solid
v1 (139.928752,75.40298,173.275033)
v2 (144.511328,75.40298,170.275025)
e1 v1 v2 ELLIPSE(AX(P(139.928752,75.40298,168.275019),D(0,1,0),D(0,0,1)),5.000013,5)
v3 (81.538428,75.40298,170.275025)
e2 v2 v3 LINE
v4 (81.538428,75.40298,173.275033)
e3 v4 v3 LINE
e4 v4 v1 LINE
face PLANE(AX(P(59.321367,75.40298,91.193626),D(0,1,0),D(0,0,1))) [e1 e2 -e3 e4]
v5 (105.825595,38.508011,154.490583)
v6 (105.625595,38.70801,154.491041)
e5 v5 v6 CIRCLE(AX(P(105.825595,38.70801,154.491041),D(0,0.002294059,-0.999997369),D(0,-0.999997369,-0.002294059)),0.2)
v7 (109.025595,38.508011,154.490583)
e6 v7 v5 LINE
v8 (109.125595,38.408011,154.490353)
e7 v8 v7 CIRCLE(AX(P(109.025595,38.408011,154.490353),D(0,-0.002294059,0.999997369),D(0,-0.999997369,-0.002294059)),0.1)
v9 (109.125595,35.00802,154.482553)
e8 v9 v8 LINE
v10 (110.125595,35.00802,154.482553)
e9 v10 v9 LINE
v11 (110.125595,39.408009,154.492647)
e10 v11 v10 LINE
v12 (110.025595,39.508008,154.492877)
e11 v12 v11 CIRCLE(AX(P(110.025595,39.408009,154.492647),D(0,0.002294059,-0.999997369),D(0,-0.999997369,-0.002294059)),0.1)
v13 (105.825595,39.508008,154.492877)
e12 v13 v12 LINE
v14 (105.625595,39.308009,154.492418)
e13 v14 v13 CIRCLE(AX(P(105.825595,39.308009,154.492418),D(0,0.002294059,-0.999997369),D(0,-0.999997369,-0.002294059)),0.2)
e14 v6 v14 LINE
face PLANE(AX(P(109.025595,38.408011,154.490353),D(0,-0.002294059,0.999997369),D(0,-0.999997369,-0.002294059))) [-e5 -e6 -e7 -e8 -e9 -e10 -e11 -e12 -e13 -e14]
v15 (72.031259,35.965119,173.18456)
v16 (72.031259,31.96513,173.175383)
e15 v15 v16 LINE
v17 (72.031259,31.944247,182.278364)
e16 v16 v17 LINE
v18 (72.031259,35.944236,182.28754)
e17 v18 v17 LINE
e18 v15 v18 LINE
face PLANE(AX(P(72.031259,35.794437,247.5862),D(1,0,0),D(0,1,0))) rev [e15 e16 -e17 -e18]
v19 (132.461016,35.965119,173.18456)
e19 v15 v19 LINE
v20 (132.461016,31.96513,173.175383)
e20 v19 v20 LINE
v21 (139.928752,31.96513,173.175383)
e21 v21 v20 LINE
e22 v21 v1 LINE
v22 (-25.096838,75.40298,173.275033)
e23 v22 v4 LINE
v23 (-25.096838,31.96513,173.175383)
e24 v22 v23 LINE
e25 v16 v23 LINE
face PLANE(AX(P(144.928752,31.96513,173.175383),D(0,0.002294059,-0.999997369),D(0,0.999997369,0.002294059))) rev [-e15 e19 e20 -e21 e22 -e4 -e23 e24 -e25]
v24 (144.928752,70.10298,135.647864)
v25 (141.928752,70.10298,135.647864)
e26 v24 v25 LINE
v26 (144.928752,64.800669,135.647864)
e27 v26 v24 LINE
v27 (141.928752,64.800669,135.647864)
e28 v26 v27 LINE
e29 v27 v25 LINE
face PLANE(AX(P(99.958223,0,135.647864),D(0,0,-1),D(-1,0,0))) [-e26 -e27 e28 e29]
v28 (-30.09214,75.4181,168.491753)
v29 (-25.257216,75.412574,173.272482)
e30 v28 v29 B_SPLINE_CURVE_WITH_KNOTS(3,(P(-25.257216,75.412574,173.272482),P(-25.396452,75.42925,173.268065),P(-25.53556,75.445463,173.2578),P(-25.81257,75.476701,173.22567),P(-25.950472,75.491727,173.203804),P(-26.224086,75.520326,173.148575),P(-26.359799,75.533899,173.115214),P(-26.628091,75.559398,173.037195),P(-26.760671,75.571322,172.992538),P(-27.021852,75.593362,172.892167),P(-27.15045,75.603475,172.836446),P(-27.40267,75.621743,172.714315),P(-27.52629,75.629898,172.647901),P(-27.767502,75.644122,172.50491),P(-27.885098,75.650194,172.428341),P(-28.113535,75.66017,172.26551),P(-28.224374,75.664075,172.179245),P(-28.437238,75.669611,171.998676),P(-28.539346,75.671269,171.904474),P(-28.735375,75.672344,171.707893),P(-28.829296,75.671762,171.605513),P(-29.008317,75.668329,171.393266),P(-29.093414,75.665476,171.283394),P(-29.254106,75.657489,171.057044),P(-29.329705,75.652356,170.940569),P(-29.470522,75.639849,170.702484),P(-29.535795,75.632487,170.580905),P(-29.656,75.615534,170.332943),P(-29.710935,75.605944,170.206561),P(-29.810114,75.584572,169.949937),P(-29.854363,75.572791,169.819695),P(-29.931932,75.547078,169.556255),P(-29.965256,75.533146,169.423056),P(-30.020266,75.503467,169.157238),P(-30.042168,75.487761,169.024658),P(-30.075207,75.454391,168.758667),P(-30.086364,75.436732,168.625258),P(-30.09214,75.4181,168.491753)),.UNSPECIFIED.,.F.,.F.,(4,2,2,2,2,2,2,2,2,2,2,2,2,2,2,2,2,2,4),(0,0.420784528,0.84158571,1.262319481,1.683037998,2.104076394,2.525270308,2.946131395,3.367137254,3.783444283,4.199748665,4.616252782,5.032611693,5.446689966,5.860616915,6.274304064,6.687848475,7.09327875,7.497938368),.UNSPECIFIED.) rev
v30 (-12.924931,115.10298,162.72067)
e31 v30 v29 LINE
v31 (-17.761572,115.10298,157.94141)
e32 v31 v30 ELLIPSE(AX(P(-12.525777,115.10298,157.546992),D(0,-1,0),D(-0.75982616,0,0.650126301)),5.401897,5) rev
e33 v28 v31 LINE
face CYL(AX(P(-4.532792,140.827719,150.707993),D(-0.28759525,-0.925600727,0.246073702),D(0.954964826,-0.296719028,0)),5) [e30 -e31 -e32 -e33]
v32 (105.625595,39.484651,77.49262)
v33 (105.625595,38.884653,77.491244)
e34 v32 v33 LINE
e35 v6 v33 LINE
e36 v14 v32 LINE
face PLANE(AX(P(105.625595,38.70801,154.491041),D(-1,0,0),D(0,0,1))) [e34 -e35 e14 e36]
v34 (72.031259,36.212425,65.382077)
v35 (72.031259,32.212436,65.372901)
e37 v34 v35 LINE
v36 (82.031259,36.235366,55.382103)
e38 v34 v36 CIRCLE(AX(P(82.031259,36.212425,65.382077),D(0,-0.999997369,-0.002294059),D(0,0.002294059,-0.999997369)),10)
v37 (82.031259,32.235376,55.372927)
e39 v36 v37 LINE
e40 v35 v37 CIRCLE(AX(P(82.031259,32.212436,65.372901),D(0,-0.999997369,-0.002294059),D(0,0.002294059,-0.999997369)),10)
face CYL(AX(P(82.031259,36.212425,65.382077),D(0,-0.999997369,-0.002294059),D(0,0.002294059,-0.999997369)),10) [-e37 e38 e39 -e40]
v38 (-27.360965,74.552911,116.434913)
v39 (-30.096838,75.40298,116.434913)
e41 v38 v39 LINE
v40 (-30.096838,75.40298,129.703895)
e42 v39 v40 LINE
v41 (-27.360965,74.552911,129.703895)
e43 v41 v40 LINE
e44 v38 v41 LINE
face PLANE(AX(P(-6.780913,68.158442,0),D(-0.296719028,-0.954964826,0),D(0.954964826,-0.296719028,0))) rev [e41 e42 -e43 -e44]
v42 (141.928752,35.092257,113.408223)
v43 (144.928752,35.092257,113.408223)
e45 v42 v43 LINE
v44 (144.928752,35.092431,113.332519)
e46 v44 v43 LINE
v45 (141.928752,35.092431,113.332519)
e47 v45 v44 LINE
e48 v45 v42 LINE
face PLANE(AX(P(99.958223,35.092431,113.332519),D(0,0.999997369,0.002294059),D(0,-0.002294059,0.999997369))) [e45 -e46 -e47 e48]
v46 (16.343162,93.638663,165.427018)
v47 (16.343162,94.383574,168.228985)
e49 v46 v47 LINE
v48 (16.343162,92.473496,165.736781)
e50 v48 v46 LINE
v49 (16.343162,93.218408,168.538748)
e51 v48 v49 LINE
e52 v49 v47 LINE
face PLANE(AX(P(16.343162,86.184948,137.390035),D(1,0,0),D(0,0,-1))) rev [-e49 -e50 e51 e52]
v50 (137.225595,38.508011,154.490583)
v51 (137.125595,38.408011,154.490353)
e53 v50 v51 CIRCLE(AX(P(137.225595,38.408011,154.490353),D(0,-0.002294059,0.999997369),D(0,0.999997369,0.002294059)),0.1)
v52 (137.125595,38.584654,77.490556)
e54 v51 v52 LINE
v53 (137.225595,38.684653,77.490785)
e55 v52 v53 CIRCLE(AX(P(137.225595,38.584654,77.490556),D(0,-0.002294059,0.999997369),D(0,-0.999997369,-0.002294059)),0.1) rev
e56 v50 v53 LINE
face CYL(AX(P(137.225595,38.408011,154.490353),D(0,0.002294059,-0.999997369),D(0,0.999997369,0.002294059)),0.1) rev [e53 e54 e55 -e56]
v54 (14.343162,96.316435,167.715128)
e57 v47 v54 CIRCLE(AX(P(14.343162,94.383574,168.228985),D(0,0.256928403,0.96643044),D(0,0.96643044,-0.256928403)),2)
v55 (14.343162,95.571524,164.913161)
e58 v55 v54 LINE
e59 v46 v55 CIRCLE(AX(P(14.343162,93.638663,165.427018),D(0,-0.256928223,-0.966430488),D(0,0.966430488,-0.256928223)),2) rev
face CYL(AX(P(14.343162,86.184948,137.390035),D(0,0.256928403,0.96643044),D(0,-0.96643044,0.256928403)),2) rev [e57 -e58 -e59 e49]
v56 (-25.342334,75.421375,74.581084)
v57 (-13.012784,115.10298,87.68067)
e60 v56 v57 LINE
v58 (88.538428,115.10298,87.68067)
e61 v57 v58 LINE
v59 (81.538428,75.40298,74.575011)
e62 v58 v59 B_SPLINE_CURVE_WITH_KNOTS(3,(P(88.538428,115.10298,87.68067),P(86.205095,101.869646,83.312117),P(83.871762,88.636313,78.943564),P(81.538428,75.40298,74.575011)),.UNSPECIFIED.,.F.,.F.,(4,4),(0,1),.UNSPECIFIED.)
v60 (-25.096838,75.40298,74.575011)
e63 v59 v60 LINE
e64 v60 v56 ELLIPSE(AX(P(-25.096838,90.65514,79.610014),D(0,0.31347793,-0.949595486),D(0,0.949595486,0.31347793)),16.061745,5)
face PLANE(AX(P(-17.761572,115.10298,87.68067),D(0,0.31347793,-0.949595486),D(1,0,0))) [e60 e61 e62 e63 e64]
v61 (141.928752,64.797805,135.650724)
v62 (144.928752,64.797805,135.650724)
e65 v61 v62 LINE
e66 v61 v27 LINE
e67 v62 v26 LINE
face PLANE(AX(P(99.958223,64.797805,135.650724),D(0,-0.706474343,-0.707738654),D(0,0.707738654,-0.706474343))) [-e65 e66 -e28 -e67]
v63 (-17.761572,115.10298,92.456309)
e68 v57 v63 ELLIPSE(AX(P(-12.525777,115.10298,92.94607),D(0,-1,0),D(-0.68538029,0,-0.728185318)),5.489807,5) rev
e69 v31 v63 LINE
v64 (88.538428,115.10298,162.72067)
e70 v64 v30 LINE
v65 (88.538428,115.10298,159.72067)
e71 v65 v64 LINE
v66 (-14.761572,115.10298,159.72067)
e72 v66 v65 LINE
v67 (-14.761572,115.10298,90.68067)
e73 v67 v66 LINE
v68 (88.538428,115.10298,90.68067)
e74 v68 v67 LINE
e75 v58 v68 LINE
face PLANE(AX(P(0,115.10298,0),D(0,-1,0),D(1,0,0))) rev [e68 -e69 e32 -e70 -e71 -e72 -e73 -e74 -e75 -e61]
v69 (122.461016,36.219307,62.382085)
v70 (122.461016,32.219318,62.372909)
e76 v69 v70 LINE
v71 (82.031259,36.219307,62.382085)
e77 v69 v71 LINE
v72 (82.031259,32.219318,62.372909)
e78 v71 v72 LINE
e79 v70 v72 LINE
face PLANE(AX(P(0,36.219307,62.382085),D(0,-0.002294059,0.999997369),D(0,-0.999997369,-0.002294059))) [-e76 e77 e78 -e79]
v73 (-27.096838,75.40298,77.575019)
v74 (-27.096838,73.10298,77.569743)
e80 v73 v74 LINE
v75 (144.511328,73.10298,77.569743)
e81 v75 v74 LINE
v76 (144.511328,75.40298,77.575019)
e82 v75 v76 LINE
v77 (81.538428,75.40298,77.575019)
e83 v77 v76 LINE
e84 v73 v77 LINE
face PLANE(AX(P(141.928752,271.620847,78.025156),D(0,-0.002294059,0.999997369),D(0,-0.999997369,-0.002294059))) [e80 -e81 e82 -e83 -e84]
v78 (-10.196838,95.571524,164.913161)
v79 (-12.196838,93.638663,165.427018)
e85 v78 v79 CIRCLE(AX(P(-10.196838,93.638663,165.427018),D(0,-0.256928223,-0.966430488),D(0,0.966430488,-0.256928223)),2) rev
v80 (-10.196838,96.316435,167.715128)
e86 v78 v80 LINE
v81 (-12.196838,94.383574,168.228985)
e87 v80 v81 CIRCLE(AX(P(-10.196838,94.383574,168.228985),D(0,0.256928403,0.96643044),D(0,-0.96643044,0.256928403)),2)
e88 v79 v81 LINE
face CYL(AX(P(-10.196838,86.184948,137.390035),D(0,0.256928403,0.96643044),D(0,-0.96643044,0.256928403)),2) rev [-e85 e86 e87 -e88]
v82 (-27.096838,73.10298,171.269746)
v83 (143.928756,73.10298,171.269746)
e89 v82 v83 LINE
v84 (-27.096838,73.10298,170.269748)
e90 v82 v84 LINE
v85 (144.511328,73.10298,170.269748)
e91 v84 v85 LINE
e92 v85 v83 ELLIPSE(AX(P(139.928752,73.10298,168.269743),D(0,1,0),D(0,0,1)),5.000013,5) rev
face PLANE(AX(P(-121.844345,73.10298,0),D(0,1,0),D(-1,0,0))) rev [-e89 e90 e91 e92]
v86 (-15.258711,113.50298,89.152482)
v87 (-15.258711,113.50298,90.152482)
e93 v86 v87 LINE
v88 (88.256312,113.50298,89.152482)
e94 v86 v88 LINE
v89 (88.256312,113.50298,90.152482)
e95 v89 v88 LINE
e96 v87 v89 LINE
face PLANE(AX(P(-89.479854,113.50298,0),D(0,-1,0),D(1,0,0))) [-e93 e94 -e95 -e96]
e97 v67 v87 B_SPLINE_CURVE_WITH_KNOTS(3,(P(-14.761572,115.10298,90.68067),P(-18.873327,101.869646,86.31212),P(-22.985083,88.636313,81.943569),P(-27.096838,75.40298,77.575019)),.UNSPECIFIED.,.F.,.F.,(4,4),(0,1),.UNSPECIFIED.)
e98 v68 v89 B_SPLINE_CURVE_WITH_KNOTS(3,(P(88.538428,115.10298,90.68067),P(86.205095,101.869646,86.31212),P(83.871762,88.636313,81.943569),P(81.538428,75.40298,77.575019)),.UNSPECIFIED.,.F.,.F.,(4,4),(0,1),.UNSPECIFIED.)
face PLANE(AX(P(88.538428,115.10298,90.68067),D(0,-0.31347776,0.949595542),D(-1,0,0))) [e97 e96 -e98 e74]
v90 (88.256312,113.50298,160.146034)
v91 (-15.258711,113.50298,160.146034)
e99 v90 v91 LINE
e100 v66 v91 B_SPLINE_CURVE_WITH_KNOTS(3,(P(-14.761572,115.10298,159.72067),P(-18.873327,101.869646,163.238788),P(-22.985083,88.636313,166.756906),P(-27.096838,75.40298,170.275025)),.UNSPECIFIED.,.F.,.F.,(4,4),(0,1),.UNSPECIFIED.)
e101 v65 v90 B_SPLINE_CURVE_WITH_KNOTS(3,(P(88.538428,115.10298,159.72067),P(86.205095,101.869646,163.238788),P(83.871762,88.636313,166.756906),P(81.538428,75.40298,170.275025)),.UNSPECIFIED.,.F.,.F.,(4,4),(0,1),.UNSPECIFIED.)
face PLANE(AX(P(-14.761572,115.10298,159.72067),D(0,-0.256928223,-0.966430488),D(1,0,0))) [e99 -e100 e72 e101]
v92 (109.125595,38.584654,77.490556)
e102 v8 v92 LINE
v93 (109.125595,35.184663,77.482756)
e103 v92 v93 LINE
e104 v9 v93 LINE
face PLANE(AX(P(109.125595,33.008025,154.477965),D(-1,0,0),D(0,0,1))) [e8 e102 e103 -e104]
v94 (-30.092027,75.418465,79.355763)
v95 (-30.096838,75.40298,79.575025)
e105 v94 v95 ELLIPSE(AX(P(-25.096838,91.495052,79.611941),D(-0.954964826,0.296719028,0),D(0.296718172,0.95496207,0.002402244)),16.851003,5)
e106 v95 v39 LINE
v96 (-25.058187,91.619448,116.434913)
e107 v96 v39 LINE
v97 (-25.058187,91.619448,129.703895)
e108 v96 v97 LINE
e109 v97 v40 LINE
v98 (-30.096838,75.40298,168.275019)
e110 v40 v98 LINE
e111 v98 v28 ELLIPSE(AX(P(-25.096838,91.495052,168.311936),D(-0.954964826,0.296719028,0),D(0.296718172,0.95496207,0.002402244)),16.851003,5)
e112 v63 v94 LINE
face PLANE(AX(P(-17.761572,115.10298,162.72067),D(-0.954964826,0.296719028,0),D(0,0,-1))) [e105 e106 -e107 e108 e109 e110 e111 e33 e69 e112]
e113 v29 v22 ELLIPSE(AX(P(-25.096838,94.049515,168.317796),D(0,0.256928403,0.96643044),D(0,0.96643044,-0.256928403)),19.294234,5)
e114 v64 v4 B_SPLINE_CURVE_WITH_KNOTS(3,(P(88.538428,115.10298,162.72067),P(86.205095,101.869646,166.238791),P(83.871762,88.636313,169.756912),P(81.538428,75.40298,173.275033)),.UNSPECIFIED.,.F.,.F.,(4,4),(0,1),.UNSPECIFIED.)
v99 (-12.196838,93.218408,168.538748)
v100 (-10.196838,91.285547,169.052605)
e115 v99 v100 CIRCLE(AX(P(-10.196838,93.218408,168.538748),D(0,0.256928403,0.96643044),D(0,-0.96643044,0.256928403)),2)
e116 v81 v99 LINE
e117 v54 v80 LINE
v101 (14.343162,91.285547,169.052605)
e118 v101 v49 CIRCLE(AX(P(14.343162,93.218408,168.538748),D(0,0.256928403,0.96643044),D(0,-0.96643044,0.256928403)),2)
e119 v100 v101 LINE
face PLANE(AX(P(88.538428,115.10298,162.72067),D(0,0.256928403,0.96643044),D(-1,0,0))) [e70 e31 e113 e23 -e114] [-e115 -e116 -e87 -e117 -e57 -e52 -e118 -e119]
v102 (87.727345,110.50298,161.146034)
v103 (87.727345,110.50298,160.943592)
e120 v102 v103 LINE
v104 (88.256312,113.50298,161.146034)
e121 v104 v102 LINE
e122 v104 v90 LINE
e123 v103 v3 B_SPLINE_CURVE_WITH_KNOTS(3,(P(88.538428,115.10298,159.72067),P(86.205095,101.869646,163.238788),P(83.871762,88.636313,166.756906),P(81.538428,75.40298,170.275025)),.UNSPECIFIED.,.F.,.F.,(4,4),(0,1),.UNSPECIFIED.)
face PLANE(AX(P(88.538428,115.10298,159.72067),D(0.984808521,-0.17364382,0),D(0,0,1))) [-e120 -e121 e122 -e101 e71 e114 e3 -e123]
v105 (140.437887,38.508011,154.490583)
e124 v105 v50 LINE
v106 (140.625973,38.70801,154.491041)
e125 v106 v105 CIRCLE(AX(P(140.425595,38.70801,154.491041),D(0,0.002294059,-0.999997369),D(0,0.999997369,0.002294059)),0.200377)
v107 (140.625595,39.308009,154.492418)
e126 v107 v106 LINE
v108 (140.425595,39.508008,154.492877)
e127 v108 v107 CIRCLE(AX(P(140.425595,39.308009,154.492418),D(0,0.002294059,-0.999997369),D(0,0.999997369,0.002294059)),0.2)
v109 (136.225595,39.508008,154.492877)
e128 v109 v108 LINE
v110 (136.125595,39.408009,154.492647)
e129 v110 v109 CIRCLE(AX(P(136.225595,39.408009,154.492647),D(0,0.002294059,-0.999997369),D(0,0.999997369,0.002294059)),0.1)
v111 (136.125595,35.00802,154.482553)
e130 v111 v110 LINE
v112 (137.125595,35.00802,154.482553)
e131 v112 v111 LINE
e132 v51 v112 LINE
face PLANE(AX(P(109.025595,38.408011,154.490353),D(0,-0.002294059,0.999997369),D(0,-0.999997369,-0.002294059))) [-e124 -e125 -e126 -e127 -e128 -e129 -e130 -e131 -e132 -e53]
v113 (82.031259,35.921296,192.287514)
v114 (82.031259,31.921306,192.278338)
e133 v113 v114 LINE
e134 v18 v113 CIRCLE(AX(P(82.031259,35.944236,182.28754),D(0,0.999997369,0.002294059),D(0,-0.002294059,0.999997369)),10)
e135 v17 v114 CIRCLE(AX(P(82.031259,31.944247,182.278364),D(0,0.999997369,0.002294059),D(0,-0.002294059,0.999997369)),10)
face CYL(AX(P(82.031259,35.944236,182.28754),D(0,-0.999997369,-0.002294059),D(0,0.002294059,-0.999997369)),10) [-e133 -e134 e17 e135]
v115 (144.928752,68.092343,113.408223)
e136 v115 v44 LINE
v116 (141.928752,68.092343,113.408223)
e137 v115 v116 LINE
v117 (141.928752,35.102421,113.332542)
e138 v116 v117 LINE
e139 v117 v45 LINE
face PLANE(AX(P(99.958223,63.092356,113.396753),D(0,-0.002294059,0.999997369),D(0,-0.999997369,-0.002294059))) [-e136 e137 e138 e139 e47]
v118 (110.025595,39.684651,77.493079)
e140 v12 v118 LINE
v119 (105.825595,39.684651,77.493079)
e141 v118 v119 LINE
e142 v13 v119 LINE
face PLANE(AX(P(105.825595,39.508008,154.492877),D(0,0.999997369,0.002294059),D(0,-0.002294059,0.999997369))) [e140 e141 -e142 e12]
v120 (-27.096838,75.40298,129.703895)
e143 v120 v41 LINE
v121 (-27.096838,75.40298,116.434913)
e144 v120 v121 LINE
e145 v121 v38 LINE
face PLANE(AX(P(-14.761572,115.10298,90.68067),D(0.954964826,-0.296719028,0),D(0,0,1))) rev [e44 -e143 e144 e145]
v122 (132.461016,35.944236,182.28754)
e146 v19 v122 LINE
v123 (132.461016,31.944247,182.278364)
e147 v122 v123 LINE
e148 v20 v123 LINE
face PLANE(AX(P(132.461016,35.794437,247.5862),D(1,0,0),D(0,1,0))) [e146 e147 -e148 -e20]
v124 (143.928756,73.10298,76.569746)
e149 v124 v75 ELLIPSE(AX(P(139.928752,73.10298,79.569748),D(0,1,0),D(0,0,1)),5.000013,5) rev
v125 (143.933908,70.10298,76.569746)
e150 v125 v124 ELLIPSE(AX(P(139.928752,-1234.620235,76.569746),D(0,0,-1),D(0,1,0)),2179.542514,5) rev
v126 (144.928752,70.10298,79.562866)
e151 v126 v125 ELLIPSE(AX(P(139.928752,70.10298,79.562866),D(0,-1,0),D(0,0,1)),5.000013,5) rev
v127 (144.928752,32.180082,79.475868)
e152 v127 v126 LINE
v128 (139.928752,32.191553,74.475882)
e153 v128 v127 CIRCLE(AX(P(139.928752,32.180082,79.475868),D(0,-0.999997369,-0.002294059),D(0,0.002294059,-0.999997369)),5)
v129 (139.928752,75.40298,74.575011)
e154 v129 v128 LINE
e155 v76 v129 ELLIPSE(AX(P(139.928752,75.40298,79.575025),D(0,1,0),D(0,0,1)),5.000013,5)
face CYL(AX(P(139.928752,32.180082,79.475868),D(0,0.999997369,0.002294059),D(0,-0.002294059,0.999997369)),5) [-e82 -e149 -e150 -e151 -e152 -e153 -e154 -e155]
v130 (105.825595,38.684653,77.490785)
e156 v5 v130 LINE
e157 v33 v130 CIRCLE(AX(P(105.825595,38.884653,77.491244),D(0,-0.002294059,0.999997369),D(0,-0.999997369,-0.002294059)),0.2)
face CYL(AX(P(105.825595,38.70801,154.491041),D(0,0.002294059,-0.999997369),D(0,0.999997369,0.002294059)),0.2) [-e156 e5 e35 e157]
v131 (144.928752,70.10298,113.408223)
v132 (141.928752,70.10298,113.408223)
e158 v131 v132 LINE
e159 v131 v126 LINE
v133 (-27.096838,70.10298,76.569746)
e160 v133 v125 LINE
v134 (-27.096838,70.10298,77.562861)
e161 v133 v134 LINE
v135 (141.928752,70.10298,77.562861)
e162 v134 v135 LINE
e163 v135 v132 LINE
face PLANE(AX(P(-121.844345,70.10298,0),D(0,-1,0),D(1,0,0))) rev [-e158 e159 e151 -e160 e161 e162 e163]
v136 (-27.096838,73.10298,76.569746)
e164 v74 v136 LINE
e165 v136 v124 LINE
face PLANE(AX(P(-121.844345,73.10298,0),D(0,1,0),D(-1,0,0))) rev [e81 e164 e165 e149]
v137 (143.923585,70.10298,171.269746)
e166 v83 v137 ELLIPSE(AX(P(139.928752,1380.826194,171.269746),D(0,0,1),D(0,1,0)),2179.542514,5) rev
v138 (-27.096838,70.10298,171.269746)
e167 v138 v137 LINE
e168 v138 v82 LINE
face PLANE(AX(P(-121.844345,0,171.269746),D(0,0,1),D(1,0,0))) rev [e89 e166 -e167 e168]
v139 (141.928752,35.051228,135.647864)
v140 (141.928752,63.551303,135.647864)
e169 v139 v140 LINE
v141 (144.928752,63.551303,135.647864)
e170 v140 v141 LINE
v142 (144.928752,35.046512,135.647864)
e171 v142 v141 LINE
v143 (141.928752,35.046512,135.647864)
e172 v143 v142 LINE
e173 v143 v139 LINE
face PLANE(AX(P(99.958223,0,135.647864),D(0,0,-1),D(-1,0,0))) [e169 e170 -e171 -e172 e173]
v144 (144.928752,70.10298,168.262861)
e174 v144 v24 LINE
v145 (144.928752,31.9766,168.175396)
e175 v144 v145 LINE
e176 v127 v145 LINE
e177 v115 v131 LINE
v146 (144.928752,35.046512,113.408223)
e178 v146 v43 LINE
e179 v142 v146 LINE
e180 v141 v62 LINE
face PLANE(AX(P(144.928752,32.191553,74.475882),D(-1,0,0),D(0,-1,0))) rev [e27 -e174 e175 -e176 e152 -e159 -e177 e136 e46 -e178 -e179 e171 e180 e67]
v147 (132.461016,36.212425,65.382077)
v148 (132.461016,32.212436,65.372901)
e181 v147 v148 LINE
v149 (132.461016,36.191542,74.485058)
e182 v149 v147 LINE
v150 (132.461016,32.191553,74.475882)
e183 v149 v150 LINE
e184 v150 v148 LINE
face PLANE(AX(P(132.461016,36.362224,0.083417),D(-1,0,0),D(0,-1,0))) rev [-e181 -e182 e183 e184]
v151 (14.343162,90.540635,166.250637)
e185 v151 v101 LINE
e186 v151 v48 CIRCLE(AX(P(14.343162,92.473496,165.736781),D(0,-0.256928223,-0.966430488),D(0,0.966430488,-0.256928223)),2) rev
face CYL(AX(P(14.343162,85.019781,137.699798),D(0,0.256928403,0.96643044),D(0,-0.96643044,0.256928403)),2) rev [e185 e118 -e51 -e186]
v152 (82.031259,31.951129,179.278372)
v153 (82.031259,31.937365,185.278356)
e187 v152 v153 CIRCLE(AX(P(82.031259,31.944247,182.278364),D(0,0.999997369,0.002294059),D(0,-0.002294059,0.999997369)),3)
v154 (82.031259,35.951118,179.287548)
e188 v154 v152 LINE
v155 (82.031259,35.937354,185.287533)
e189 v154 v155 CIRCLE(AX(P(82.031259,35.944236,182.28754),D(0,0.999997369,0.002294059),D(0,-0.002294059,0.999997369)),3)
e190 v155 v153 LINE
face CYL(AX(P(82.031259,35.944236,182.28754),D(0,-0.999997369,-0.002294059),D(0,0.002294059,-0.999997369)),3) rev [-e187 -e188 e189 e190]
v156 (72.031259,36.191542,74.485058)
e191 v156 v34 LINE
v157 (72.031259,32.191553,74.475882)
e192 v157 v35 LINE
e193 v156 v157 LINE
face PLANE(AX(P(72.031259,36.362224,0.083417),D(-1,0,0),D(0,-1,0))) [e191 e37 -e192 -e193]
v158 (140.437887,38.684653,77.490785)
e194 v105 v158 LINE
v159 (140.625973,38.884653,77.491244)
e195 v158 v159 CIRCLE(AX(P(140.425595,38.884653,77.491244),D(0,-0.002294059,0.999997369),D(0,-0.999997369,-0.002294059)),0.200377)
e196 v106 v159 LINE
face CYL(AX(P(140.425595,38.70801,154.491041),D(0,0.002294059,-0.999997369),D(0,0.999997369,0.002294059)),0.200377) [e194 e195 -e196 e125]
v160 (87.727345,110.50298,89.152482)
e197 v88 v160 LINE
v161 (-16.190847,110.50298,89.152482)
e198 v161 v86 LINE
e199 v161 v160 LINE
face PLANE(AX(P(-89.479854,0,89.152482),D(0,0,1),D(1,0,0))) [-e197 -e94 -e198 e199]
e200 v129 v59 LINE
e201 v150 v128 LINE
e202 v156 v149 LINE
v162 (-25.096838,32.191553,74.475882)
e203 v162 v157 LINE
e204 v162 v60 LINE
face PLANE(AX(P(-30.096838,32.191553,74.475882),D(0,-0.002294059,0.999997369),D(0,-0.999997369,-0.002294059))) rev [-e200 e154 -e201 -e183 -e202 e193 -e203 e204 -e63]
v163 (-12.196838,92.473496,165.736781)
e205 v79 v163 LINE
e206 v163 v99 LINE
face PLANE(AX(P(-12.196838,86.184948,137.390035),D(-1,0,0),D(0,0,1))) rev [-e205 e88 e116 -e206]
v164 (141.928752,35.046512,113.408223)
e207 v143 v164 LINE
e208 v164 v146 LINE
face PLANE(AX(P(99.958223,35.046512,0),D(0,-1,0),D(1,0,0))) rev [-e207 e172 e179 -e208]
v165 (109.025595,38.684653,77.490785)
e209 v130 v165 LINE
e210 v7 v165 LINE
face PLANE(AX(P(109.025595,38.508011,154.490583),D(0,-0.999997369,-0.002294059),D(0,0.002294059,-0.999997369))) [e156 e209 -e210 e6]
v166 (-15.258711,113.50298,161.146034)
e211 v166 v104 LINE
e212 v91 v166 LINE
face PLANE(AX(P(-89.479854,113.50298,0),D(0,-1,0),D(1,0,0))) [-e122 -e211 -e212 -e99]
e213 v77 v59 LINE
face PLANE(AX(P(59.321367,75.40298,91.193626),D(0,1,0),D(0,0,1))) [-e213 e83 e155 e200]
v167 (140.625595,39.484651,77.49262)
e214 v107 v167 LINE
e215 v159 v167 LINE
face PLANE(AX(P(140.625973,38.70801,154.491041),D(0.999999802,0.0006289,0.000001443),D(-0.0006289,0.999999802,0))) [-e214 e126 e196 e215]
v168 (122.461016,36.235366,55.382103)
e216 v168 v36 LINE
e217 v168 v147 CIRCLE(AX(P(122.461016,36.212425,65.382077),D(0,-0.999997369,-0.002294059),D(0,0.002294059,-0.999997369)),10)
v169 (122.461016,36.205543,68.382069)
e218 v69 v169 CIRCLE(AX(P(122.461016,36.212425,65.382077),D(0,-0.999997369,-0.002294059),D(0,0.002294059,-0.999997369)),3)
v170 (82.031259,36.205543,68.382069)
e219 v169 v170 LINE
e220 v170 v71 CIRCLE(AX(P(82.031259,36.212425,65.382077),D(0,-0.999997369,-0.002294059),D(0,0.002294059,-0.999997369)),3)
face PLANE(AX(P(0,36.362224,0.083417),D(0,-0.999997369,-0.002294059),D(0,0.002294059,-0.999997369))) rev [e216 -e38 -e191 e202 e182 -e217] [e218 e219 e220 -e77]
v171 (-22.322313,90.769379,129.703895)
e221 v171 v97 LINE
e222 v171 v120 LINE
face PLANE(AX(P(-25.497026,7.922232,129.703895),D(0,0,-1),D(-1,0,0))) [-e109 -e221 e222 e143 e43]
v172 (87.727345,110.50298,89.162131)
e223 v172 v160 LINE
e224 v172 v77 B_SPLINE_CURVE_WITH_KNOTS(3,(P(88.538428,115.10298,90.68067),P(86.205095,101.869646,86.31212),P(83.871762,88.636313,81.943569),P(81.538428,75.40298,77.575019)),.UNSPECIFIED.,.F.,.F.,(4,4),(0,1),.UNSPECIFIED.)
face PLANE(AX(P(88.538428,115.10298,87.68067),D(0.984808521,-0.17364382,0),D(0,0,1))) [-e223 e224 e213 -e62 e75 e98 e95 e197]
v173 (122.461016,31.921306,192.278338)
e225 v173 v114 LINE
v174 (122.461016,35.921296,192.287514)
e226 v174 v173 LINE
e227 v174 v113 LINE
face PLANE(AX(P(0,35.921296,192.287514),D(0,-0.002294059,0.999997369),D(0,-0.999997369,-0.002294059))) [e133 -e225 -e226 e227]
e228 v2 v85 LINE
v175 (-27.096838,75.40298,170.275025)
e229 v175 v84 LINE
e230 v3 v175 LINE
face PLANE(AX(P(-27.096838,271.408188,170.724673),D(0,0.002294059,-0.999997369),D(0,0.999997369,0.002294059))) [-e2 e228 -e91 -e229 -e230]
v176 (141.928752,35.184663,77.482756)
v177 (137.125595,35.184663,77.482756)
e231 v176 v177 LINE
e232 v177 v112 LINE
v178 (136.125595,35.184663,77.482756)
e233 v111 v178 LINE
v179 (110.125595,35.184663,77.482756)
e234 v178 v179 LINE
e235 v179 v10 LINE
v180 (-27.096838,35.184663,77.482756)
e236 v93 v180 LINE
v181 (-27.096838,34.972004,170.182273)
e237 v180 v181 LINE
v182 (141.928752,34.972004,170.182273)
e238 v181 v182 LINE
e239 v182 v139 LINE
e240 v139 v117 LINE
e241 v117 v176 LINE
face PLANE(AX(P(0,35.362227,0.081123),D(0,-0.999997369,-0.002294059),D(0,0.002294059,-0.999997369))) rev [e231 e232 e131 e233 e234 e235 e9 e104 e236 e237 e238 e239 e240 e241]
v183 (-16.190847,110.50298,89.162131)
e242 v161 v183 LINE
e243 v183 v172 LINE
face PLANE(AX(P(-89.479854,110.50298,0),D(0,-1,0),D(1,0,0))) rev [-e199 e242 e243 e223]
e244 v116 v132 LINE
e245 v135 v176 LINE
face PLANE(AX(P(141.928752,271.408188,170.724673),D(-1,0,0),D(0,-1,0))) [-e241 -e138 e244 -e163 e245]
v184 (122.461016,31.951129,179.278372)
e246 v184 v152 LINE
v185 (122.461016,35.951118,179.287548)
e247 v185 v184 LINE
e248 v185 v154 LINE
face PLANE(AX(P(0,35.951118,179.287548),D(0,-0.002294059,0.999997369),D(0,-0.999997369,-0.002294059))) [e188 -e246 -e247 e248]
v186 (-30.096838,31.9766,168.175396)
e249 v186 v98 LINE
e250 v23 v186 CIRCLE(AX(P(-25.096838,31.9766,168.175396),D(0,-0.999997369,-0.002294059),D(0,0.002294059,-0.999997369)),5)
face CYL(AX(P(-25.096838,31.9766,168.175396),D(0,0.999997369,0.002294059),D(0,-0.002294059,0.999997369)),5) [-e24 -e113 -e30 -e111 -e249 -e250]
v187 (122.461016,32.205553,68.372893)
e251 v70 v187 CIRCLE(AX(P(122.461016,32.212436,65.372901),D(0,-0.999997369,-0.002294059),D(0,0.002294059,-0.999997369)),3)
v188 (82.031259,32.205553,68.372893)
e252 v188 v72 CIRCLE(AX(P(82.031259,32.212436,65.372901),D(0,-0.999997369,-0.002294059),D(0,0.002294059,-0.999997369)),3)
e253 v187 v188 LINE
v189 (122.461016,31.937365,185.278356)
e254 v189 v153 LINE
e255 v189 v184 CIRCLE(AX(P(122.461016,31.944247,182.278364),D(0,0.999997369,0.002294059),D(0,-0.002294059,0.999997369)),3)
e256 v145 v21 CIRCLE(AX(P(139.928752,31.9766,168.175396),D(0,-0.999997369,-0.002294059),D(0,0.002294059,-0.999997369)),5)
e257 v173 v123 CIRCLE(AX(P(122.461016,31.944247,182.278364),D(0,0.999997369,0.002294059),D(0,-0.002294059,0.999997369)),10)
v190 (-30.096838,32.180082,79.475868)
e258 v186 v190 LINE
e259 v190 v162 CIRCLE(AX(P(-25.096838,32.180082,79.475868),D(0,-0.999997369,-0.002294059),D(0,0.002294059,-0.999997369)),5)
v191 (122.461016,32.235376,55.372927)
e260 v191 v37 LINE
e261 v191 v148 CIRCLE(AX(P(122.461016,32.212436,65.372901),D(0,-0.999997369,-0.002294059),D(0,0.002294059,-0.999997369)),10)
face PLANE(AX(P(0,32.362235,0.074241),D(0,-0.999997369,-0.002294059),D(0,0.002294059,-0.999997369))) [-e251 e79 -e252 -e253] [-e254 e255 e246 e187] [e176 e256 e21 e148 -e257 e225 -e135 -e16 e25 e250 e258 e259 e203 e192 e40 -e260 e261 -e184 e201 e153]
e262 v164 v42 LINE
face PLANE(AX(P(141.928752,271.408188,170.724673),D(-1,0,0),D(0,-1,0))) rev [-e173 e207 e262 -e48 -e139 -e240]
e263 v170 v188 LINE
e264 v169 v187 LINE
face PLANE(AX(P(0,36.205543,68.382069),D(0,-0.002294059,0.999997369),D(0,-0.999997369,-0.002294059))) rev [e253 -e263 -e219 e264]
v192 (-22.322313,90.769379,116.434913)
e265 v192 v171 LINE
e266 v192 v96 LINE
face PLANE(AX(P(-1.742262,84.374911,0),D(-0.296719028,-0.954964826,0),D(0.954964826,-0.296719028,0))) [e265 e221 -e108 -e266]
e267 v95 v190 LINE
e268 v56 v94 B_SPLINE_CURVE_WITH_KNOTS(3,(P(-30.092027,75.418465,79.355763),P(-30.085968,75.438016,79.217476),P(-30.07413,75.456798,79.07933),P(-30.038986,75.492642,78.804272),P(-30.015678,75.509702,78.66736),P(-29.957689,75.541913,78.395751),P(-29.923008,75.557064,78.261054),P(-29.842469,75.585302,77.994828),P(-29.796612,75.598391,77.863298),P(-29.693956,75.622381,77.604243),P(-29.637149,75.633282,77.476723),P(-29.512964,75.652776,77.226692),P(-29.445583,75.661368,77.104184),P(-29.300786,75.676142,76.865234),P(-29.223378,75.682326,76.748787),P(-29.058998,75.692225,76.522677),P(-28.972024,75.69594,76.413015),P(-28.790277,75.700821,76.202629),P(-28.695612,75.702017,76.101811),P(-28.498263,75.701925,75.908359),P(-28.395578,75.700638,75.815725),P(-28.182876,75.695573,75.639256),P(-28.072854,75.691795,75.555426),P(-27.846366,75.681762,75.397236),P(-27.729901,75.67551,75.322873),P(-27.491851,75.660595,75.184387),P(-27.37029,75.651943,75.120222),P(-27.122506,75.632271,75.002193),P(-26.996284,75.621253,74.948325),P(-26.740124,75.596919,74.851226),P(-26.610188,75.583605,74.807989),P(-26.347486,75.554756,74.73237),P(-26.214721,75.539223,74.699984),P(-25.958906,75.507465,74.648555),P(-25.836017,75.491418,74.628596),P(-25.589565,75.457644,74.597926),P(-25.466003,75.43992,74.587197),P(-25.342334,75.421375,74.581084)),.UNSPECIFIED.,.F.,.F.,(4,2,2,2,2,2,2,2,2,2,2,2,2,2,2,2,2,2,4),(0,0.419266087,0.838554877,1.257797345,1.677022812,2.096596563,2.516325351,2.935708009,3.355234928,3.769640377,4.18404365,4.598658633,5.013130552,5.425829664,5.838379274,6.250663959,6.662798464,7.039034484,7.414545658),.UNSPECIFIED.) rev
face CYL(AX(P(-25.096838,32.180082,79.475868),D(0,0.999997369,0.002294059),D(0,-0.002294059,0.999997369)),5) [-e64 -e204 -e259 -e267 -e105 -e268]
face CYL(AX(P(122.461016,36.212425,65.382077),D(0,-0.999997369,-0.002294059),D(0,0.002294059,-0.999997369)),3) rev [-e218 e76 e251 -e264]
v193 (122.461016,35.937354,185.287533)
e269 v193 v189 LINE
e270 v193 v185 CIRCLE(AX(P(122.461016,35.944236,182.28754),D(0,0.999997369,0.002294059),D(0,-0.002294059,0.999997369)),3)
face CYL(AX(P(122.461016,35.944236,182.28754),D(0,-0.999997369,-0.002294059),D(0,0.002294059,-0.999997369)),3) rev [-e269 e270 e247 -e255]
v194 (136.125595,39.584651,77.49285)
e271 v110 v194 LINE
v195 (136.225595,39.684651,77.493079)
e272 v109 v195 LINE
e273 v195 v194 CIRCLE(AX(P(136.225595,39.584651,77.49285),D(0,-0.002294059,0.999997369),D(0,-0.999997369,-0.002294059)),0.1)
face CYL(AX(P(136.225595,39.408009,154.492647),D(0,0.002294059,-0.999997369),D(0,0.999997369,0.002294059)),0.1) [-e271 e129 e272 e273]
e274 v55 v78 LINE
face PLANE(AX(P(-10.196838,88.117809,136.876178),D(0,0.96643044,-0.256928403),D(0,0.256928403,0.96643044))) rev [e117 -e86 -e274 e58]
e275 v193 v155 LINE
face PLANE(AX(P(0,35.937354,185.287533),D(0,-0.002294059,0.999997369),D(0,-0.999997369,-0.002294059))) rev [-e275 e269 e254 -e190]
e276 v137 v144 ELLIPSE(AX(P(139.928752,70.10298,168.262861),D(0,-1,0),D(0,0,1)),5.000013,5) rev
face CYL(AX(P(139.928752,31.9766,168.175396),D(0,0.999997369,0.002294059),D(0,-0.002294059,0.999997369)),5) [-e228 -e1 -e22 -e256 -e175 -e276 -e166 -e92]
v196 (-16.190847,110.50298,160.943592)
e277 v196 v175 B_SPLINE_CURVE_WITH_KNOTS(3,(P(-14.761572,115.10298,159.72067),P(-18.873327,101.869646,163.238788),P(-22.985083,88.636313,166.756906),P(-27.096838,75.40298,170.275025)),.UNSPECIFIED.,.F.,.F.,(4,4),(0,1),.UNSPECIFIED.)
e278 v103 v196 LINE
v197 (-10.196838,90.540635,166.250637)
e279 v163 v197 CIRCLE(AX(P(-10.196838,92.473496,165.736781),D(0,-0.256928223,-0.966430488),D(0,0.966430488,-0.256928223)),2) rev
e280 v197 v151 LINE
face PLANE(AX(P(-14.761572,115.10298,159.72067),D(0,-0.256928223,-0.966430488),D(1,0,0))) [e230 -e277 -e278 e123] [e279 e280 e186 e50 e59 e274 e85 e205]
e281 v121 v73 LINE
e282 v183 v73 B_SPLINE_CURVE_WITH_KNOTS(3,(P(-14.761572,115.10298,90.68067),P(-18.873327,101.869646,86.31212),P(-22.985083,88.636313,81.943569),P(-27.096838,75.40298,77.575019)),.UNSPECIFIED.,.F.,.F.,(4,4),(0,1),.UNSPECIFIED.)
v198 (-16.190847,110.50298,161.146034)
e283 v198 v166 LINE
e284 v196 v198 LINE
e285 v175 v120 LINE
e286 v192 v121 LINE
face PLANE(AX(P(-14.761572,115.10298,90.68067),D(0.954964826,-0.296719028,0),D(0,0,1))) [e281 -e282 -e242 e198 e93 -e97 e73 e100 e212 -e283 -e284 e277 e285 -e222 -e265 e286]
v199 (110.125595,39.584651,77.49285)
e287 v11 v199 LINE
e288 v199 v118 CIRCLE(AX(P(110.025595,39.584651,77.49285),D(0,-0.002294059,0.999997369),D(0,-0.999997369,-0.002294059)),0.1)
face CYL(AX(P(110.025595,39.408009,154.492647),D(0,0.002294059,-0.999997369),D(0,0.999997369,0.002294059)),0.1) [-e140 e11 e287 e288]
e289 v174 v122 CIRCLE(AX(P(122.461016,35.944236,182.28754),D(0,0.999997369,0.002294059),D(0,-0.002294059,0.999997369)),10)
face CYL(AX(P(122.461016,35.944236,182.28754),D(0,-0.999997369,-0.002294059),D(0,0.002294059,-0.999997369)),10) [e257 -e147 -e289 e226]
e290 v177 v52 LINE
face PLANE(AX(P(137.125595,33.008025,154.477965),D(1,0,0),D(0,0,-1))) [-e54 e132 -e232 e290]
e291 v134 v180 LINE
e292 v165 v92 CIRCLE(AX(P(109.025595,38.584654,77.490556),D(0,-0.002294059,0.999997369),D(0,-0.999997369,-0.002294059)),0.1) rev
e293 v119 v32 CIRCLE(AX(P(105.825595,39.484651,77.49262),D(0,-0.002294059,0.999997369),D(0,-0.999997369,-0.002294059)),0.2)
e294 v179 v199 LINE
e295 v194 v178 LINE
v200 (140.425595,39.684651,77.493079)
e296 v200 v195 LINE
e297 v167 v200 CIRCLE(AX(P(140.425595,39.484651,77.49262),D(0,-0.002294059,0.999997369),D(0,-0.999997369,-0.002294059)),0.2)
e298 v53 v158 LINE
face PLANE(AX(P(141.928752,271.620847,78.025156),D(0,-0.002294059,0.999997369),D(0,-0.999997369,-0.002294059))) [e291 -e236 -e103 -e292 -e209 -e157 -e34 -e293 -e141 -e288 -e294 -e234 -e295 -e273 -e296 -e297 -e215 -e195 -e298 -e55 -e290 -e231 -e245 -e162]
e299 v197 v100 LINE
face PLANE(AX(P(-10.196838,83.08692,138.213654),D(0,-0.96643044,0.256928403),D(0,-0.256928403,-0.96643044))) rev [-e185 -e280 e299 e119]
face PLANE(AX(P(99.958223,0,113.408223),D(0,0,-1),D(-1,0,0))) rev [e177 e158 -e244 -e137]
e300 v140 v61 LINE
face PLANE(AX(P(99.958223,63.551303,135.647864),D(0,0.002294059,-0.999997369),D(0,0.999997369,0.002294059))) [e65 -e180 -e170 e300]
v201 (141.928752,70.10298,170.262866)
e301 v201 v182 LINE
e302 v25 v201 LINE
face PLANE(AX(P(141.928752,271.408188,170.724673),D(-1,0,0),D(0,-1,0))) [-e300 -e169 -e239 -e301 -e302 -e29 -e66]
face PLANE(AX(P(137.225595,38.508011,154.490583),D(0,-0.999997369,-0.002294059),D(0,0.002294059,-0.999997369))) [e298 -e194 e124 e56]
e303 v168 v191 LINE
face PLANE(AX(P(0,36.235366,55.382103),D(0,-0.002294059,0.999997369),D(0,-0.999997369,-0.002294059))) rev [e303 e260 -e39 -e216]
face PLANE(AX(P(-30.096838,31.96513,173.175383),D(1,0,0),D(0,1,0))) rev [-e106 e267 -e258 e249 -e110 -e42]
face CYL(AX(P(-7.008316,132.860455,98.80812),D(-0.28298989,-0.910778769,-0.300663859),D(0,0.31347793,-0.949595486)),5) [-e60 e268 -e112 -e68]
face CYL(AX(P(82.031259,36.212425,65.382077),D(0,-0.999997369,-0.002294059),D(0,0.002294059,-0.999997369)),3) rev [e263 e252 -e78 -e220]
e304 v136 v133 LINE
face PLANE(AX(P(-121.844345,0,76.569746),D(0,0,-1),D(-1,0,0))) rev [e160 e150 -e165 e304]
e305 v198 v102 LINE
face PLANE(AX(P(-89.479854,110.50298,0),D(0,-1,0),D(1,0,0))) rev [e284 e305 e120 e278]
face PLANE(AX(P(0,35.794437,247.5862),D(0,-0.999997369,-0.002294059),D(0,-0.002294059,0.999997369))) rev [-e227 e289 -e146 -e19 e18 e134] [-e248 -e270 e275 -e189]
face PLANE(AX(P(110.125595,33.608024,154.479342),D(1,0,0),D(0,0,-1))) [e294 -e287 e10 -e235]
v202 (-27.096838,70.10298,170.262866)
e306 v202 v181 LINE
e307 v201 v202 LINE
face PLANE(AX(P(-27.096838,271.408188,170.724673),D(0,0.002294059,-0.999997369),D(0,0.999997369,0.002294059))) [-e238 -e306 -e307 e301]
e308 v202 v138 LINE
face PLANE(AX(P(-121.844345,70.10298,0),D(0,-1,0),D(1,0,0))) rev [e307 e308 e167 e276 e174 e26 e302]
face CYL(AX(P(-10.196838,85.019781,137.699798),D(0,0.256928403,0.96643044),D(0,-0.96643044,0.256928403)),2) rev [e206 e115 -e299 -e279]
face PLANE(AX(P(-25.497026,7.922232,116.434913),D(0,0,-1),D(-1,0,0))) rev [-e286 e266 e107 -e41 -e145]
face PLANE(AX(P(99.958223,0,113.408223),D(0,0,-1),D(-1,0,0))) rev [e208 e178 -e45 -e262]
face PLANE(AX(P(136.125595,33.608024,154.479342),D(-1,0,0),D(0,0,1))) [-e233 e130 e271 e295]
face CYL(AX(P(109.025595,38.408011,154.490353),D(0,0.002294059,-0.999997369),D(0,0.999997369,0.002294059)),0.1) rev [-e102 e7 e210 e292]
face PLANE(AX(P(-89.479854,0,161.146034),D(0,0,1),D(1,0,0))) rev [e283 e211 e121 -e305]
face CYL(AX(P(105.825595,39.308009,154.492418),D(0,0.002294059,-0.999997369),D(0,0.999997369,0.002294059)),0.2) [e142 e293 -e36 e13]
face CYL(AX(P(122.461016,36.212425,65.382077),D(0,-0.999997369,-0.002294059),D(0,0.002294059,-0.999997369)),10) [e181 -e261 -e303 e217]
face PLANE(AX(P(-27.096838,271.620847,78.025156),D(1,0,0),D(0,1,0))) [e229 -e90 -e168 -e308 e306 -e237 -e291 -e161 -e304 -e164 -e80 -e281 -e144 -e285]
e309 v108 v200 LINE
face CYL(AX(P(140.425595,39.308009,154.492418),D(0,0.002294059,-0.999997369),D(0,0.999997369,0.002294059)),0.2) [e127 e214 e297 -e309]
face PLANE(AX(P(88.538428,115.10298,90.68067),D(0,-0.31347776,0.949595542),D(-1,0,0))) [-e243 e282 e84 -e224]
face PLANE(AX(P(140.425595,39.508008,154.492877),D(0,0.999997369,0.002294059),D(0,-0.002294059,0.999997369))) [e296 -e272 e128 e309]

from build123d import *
from OCP.BRepAlgoAPI import BRepAlgoAPI_Cut
from OCP.TopTools import TopTools_ListOfShape

# Parameters (mm, degrees)
SKETCH1_W            = 175.025590169
SKETCH1_H            = 98.699761336
BOSS_EXTRUDE1_DEPTH  = 3
SKETCH2_W            = 175.025590169
SKETCH2_H            = 98.699761336
SKETCH2_W_2          = 169.025590169
SKETCH2_H_2          = 92.699761336
BOSS_EXTRUDE2_DEPTH  = 35.5
BOSS_EXTRUDE3_DEPTH  = 80
CUT_EXTRUDE1_DEPTH   = 3
BOSS_EXTRUDE18_REACH = 231.088
CUT_EXTRUDE2_DEPTH   = 172.025590169
CUT_EXTRUDE6_DEPTH   = 10
CUT_EXTRUDE9_REACH   = 273.858
SKETCH20_W           = 55.04
SKETCH20_H           = 1.6
SKETCH20_W_2         = 71.993551849
SKETCH20_H_2         = 3
SKETCH21_W           = 13.268982054
SKETCH21_H           = 16.981220693
CUT_EXTRUDE10_DEPTH  = 2.864894477
CUT_EXTRUDE11_DEPTH  = 2.899295446
FILLET1_R            = 5
BOSS_EXTRUDE21_DEPTH = 4


with BuildPart() as part:
    # Sketch1 → Boss-Extrude1 (new body)
    with BuildSketch(Plane(origin=(0, 35.362227101, 0.081123263), x_dir=(1, 0, 0), z_dir=(6.9833353168161736e-15, -0.9999973686422646, -0.002294059403524814))):
        with Locations((57.415956998, 123.751717011)):
            Rectangle(SKETCH1_W, SKETCH1_H)
    extrude(amount=BOSS_EXTRUDE1_DEPTH)

    # Sketch2 → Boss-Extrude2 (add)
    with BuildSketch(Plane(origin=(0, 35.362227101, 0.081123263), x_dir=(1, 0, 0), z_dir=(-6.991181572878775e-15, 0.9999973686422646, 0.0022940594035248327))):
        with Locations((57.415956998, -123.751717011)):
            Rectangle(SKETCH2_W, SKETCH2_H)
        with Locations((57.415956998, -123.751717011)):
            Rectangle(SKETCH2_W_2, SKETCH2_H_2, mode=Mode.SUBTRACT)
    extrude(amount=BOSS_EXTRUDE2_DEPTH)

    # Sketch4 → Boss-Extrude3 (add)
    with BuildSketch(Plane(origin=(0, -0.170682232, 74.401640566), x_dir=(-1, 0, 0), z_dir=(0, 0.0022940594035248145, -0.9999973686422646))):
        with BuildLine():
            Line((-137.125595462, 33.362320152), (-137.125595462, 38.762320152))
            ThreePointArc((-137.125595462, 38.762320152), (-137.154884784, 38.83303083), (-137.225595462, 38.862320152))
            Line((-137.225595462, 38.862320152), (-140.437886876, 38.862320152))
            ThreePointArc((-140.437886876, 38.862320152), (-140.571564636, 38.925046414), (-140.625972803, 39.062320152))
            Line((-140.625972803, 39.062320152), (-140.625595462, 39.662320152))
            ThreePointArc((-140.625595462, 39.662320152), (-140.567016818, 39.803741508), (-140.425595462, 39.862320152))
            Line((-140.425595462, 39.862320152), (-136.225595462, 39.862320152))
            ThreePointArc((-136.225595462, 39.862320152), (-136.154884784, 39.83303083), (-136.125595462, 39.762320152))
            Line((-136.125595462, 39.762320152), (-136.125595462, 33.962320152))
            ThreePointArc((-136.125595462, 33.962320152), (-136.09630614, 33.891609474), (-136.025595462, 33.862320152))
            Line((-136.025595462, 33.862320152), (-110.225595462, 33.862320152))
            ThreePointArc((-110.225595462, 33.862320152), (-110.154884784, 33.891609474), (-110.125595462, 33.962320152))
            Line((-110.125595462, 33.962320152), (-110.125595462, 39.762320152))
            ThreePointArc((-110.125595462, 39.762320152), (-110.09630614, 39.83303083), (-110.025595462, 39.862320152))
            Line((-110.025595462, 39.862320152), (-105.825595462, 39.862320152))
            ThreePointArc((-105.825595462, 39.862320152), (-105.684174106, 39.803741508), (-105.625595462, 39.662320152))
            Line((-105.625595462, 39.662320152), (-105.625595462, 39.062320152))
            ThreePointArc((-105.625595462, 39.062320152), (-105.684174106, 38.920898796), (-105.825595462, 38.862320152))
            Line((-105.825595462, 38.862320152), (-109.025595462, 38.862320152))
            ThreePointArc((-109.025595462, 38.862320152), (-109.09630614, 38.83303083), (-109.125595462, 38.762320152))
            Line((-109.125595462, 38.762320152), (-109.125595462, 33.362320152))
            Line((-109.125595462, 33.362320152), (-109.125595462, 32.362320152))
            Line((-109.125595462, 32.362320152), (-137.125595462, 32.362320152))
            Line((-137.125595462, 32.362320152), (-137.125595462, 33.362320152))
        make_face()
    extrude(amount=-BOSS_EXTRUDE3_DEPTH)

    # Sketch5 → Cut-Extrude1 (cut)
    with BuildSketch(Plane(origin=(144.928752082, 0, 0), x_dir=(0, 0, -1), z_dir=(1, 0, 0))):
        Polygon((-135.647864414, 70.612709498), (-135.647864414, 64.800669259), (-135.65072397, 64.797804586), (-135.647864414, 63.551303119), (-135.647864414, 35.046511612), (-113.408223309, 35.046511612), (-113.408223309, 35.092257349), (-113.332519351, 35.092431019), (-113.408223309, 68.092343044), (-113.408223309, 70.612709498), align=None)
    extrude(amount=-CUT_EXTRUDE1_DEPTH, mode=Mode.SUBTRACT)

    # Boss-Extrude18: up to this plane
    boss_extrude18_end = Plane(origin=(59.321367117, 75.402979661, 91.193626143), z_dir=(0, 1, 0))
    # Sketch13 → Boss-Extrude18 (add, up to the surface)
    with BuildSketch(Plane(origin=(0, 70.862133688, 0.162562372), x_dir=(1, 0, 0), z_dir=(-8.261822211046718e-15, 0.9999973686422646, 0.002294059403524814)), mode=Mode.PRIVATE) as boss_extrude18_sk1:
        Polygon((141.928752082, -113.245958928), (144.928752082, -113.245958928), (144.928752082, -74.401836343), (-30.096838087, -74.401836343), (-30.096838087, -173.101597679), (144.928752082, -173.101597679), (144.928752082, -135.485658553), (141.928752082, -135.485658553), (141.928752082, -170.101597679), (-27.096838087, -170.101597679), (-27.096838087, -77.401836343), (141.928752082, -77.401836343), align=None)
    boss_extrude18_tool1 = split(extrude(boss_extrude18_sk1.sketch, amount=BOSS_EXTRUDE18_REACH, mode=Mode.PRIVATE), bisect_by=boss_extrude18_end, keep=Keep.BOTH, mode=Mode.PRIVATE)
    add(boss_extrude18_tool1.solids().sort_by_distance((143.428752, 70.60695, 111.398861))[0])

    # Sketch14 → Cut-Extrude2 (cut)
    with BuildSketch(Plane(origin=(144.928752082, 0, 0), x_dir=(0, 0, -1), z_dir=(1, 0, 0))):
        Polygon((-135.647864414, 70.551321539), (-135.653718085, 73.102979661), (-169.269745666, 73.102979661), (-171.269745666, 73.102979661), (-171.269745666, 70.102979661), (-135.647864414, 70.102979661), align=None)
        Polygon((-76.569745666, 73.102979661), (-78.569745666, 73.102979661), (-113.413959938, 73.102979661), (-113.408223309, 70.602340731), (-113.408223309, 70.102979661), (-76.569745666, 70.102979661), align=None)
        Polygon((-113.408223309, 70.602340731), (-113.413959938, 73.102979661), (-135.653718085, 73.102979661), (-135.647864414, 70.551321539), (-135.647864414, 70.102979661), (-113.408223309, 70.102979661), align=None)
    extrude(amount=-CUT_EXTRUDE2_DEPTH, mode=Mode.SUBTRACT)

    # Sketch15 → Cut-Extrude6 (cut)
    with BuildSketch(Plane(origin=(144.928752082, 0, 0), x_dir=(0, 0, -1), z_dir=(1, 0, 0))):
        Polygon((-113.419236289, 75.402979661), (-113.413959938, 73.102979661), (-77.569743035, 73.102979661), (-77.575019386, 75.402979661), align=None)
        Polygon((-135.653718085, 73.102979661), (-170.269748298, 73.102979661), (-170.275024648, 75.402979661), (-135.653718085, 75.402979661), align=None)
    extrude(amount=-CUT_EXTRUDE6_DEPTH, mode=Mode.SUBTRACT)

    # Loft1: read off the stored shape, not the designer's step
    # Loft1: loft between two sections, ruled curve by curve
    loft1_from = [
        Edge.make_line((-30.096838087, 75.402979661, 173.275032542), (81.538428177, 75.402979661, 173.275032542)),
        Edge.make_line((81.538428177, 75.402979661, 173.275032542), (81.538428177, 75.402979661, 170.275024648)),
        Edge.make_line((81.53842818, 75.402979661, 77.575019386), (81.53842818, 75.402979661, 74.575011492)),
        Edge.make_line((81.538428177, 75.402979661, 170.275024648), (-27.096838087, 75.402979661, 170.275024648)),
        Edge.make_line((-27.096838087, 75.402979661, 170.275024648), (-27.096838087, 75.402979661, 77.575019386)),
        Edge.make_line((-27.096838087, 75.402979661, 77.575019386), (81.53842818, 75.402979661, 77.575019386)),
        Edge.make_line((81.53842818, 75.402979661, 74.575011492), (-30.096838087, 75.402979661, 74.575011492)),
        Edge.make_line((-30.096838087, 75.402979661, 74.575011492), (-30.096838087, 75.402979661, 173.275032542)),
    ]
    loft1_to = [
        Edge.make_line((-17.76157182, 115.102979661, 162.720669643), (88.538428181, 115.102979661, 162.720669643)),
        Edge.make_line((88.538428181, 115.102979661, 162.720669643), (88.538428181, 115.102979661, 159.720669643)),
        Edge.make_line((88.538428181, 115.102979661, 90.680669643), (88.538428181, 115.102979661, 87.680669643)),
        Edge.make_line((88.538428181, 115.102979661, 159.720669643), (-14.761571819, 115.102979661, 159.720669643)),
        Edge.make_line((-14.761571819, 115.102979661, 159.720669643), (-14.761571819, 115.102979661, 90.680669643)),
        Edge.make_line((-14.761571819, 115.102979661, 90.680669643), (88.538428181, 115.102979661, 90.680669643)),
        Edge.make_line((88.538428181, 115.102979661, 87.680669643), (-17.76157182, 115.102979661, 87.680669643)),
        Edge.make_line((-17.76157182, 115.102979661, 87.680669643), (-17.76157182, 115.102979661, 162.720669643)),
    ]
    loft1 = Solid(Shell([*[Face.make_surface_from_curves(loft1_from[k], loft1_to[k]) for k in range(8)], Face(Wire(loft1_from)), Face(Wire(loft1_to))]))
    add(loft1)

    # Cut-Extrude9: up to this plane
    cut_extrude9_end = Plane(origin=(-14.761571819, 115.102979661, 90.680669643), z_dir=(0.9549648258216218, -0.2967190277745592, 0))
    # Sketch20 → Cut-Extrude9 (cut, up to the surface)
    with BuildSketch(Plane(origin=(144.928752082, 0, 0), x_dir=(0, 0, -1), z_dir=(1, 0, 0)), mode=Mode.PRIVATE) as cut_extrude9_sk1:
        with Locations((-125.200669643, 114.302979661)):
            Rectangle(SKETCH20_W, SKETCH20_H)
    cut_extrude9_tool1 = split(extrude(cut_extrude9_sk1.sketch, amount=-CUT_EXTRUDE9_REACH, mode=Mode.PRIVATE), bisect_by=cut_extrude9_end, keep=Keep.BOTH, mode=Mode.PRIVATE)
    add(cut_extrude9_tool1.solids().sort_by_distance((144.928752, 114.30298, 125.20067))[0], mode=Mode.SUBTRACT)
    # Sketch20 → Cut-Extrude9 (cut, up to the surface)
    with BuildSketch(Plane(origin=(144.928752082, 0, 0), x_dir=(0, 0, -1), z_dir=(1, 0, 0)), mode=Mode.PRIVATE) as cut_extrude9_sk2:
        with Locations((-125.149258153, 112.002979661)):
            Rectangle(SKETCH20_W_2, SKETCH20_H_2)
    cut_extrude9_tool2 = split(extrude(cut_extrude9_sk2.sketch, amount=-CUT_EXTRUDE9_REACH, mode=Mode.PRIVATE), bisect_by=cut_extrude9_end, keep=Keep.BOTH, mode=Mode.PRIVATE)
    add(cut_extrude9_tool2.solids().sort_by_distance((144.928752, 112.00298, 125.149258))[0], mode=Mode.SUBTRACT)

    # Sketch21 → Cut-Extrude10 (cut)
    with BuildSketch(Plane(origin=(-48.812951207, 15.166769532, 0), x_dir=(0, 0, 1), z_dir=(-0.9549648258269783, 0.2967190277573198, -6.667019861839508e-15))):
        with Locations((123.069403721, 71.56749915)):
            Rectangle(SKETCH21_W, SKETCH21_H)
    extrude(amount=-CUT_EXTRUDE10_DEPTH, mode=Mode.SUBTRACT)


with BuildPart() as cut_extrude11_tool:
    # Sketch22 → Cut-Extrude11 (new body)
    with BuildSketch(Plane(origin=(0, 48.002301666, 180.559584161), x_dir=(1, 0, 0), z_dir=(-1.1871401813108906e-14, 0.2569284026079074, 0.9664304402973601))):
        with BuildLine():
            Line((-10.196838087, 49.992354943), (14.343161913, 49.992354943))
            ThreePointArc((14.343161913, 49.992354943), (15.757375475, 49.406568505), (16.343161913, 47.992354943))
            Line((16.343161913, 47.992354943), (16.343161913, 46.78671544))
            ThreePointArc((16.343161913, 46.78671544), (15.757375475, 45.372501878), (14.343161913, 44.78671544))
            Line((14.343161913, 44.78671544), (-10.196838087, 44.78671544))
            ThreePointArc((-10.196838087, 44.78671544), (-11.611051649, 45.372501878), (-12.196838087, 46.78671544))
            Line((-12.196838087, 46.78671544), (-12.196838087, 47.992354943))
            ThreePointArc((-12.196838087, 47.992354943), (-11.611051649, 49.406568505), (-10.196838087, 49.992354943))
        make_face()
    extrude(amount=-CUT_EXTRUDE11_DEPTH)


with BuildPart() as part_1:
    add(part.part)

    # Cut-Extrude11: cut by cut_extrude11_tool, with a tolerance
    cut_extrude11_stock = TopTools_ListOfShape()
    cut_extrude11_stock.Append(part_1.part.wrapped)
    cut_extrude11_tools = TopTools_ListOfShape()
    cut_extrude11_tools.Append(cut_extrude11_tool.part.wrapped)
    cut_extrude11_cut = BRepAlgoAPI_Cut()
    cut_extrude11_cut.SetArguments(cut_extrude11_stock)
    cut_extrude11_cut.SetTools(cut_extrude11_tools)
    cut_extrude11_cut.SetFuzzyValue(0.00001)
    cut_extrude11_cut.Build()
    add(Compound.cast(cut_extrude11_cut.Shape()).solids(), mode=Mode.REPLACE)

    # Fillet1
    # the kernel refuses this fillet: 5 mm, written as the material it takes off along each edge
    with BuildSketch(Plane(origin=(144.928752082, 87.902946769, 173.303708285), x_dir=(-2.842170943040428e-14, 0.0022940594035265596, -0.9999973686422645), z_dir=(1.3086114820877341e-15, -0.9999973686422645, -0.0022940594035265596))) as fillet1_piece_1:
        with BuildLine():
            CenterArc((FILLET1_R, -FILLET1_R), FILLET1_R, 90, 90)
            Line((0, -FILLET1_R), (0, 0))
            Line((0, 0), (FILLET1_R, 0))
        make_face()
    fillet1_piece_1_solid = extrude(amount=68.437964315, mode=Mode.PRIVATE)
    with BuildSketch(Plane(origin=(144.928752082, 19.691585655, 74.447205908), x_dir=(0, -0.002294059403524528, 0.9999973686422645), z_dir=(-7.235076541341869e-15, 0.9999973686422646, 0.002294059403524528))) as fillet1_piece_2:
        with BuildLine():
            CenterArc((FILLET1_R, -FILLET1_R), FILLET1_R, 90, 90)
            Line((0, -FILLET1_R), (0, 0))
            Line((0, 0), (FILLET1_R, 0))
        make_face()
    fillet1_piece_2_solid = extrude(amount=68.211540603, mode=Mode.PRIVATE)
    with BuildSketch(Plane(origin=(-35.574773459, 57.772712947, 68.754954851), x_dir=(0.9591228921497503, -0.2687259220295025, -0.08871108489750493), z_dir=(0.2829898898446702, 0.9107787690719829, 0.30066385890795916))) as fillet1_piece_3:
        with BuildLine():
            CenterArc((FILLET1_R * 0.9109342886, -FILLET1_R), FILLET1_R, 90, 84.662925908)
            Line((-FILLET1_R * 0.0847304313661, -FILLET1_R * 0.906985133366), (0, 0))
            Line((0, 0), (FILLET1_R * 0.9109342886, 0))
        make_face()
    fillet1_piece_3_solid = extrude(amount=74.333102768, mode=Mode.PRIVATE)
    with BuildSketch(Plane(origin=(-35.758808566, 57.180411689, 178.119556354), x_dir=(0.9577520410970738, -0.27794080400398097, 0.07389138815863325), z_dir=(0.287595249916248, 0.9256007267731117, -0.24607370201364104))) as fillet1_piece_4:
        with BuildLine():
            CenterArc((FILLET1_R * 0.926460606246, FILLET1_R), FILLET1_R, 184.372217137, 85.627782863)
            Line((-FILLET1_R * 0.0706292300039, FILLET1_R * 0.923764454174), (0, 0))
            Line((0, 0), (FILLET1_R * 0.926460606246, 0))
        make_face()
    fillet1_piece_4_solid = extrude(amount=74.159109449, mode=Mode.PRIVATE)
    with BuildSketch(Plane(origin=(-30.096838087, 96.652923745, 173.323781305), x_dir=(1, 0, 0), z_dir=(6.951998498590891e-15, -0.9999973686422645, -0.0022940594035271494))) as fillet1_piece_5:
        with BuildLine():
            CenterArc((FILLET1_R, -FILLET1_R), FILLET1_R, 90, 90)
            Line((0, -FILLET1_R), (0, 0))
            Line((0, 0), (FILLET1_R, 0))
        make_face()
    fillet1_piece_5_solid = extrude(amount=77.187964315, mode=Mode.PRIVATE)
    with BuildSketch(Plane(origin=(-30.096838087, 19.691585655, 74.447205908), x_dir=(1, 0, 0), z_dir=(-7.070642983583899e-15, 0.9999973686422646, 0.0022940594035247915))) as fillet1_piece_6:
        with BuildLine():
            CenterArc((FILLET1_R, -FILLET1_R), FILLET1_R, 90, 90)
            Line((0, -FILLET1_R), (0, 0))
            Line((0, 0), (FILLET1_R, 0))
        make_face()
    fillet1_piece_6_solid = extrude(amount=76.961540603, mode=Mode.PRIVATE)
    add([fillet1_piece_1_solid, fillet1_piece_2_solid, fillet1_piece_3_solid, fillet1_piece_4_solid, fillet1_piece_5_solid, fillet1_piece_6_solid], mode=Mode.SUBTRACT)

    # Sketch25 → Boss-Extrude21 (add)
    with BuildSketch(Plane(origin=(0, 32.362234995, 0.074241085), x_dir=(1, 0, 0), z_dir=(6.977506045685946e-15, -0.9999973686422646, -0.002294059403524763))):
        with BuildLine():
            Line((132.461015957, 65.298831473), (132.461015957, 74.401836343))
            Line((132.461015957, 74.401836343), (72.0312592, 74.401836343))
            Line((72.0312592, 74.401836343), (72.0312592, 65.298831473))
            ThreePointArc((72.0312592, 65.298831473), (74.960191388, 58.227763661), (82.0312592, 55.298831473))
            Line((82.0312592, 55.298831473), (122.461015957, 55.298831473))
            ThreePointArc((122.461015957, 55.298831473), (129.532083769, 58.227763661), (132.461015957, 65.298831473))
        make_face()
        with BuildLine():
            ThreePointArc((122.461015957, 68.298831473), (125.461015957, 65.298831473), (122.461015957, 62.298831473))
            Line((122.461015957, 62.298831473), (82.0312592, 62.298831473))
            ThreePointArc((82.0312592, 62.298831473), (79.0312592, 65.298831473), (82.0312592, 68.298831473))
            Line((82.0312592, 68.298831473), (122.461015957, 68.298831473))
        make_face(mode=Mode.SUBTRACT)
    boss_extrude21 = extrude(amount=-BOSS_EXTRUDE21_DEPTH)

    # Mirror2: Boss-Extrude21 across plane
    add(boss_extrude21.mirror(Plane(origin=(0, -0.28389379, 123.751391376), x_dir=(1, 0, 0), z_dir=(0, 0.0022940594035248145, -0.9999973686422646))))


solid = part_1.part
